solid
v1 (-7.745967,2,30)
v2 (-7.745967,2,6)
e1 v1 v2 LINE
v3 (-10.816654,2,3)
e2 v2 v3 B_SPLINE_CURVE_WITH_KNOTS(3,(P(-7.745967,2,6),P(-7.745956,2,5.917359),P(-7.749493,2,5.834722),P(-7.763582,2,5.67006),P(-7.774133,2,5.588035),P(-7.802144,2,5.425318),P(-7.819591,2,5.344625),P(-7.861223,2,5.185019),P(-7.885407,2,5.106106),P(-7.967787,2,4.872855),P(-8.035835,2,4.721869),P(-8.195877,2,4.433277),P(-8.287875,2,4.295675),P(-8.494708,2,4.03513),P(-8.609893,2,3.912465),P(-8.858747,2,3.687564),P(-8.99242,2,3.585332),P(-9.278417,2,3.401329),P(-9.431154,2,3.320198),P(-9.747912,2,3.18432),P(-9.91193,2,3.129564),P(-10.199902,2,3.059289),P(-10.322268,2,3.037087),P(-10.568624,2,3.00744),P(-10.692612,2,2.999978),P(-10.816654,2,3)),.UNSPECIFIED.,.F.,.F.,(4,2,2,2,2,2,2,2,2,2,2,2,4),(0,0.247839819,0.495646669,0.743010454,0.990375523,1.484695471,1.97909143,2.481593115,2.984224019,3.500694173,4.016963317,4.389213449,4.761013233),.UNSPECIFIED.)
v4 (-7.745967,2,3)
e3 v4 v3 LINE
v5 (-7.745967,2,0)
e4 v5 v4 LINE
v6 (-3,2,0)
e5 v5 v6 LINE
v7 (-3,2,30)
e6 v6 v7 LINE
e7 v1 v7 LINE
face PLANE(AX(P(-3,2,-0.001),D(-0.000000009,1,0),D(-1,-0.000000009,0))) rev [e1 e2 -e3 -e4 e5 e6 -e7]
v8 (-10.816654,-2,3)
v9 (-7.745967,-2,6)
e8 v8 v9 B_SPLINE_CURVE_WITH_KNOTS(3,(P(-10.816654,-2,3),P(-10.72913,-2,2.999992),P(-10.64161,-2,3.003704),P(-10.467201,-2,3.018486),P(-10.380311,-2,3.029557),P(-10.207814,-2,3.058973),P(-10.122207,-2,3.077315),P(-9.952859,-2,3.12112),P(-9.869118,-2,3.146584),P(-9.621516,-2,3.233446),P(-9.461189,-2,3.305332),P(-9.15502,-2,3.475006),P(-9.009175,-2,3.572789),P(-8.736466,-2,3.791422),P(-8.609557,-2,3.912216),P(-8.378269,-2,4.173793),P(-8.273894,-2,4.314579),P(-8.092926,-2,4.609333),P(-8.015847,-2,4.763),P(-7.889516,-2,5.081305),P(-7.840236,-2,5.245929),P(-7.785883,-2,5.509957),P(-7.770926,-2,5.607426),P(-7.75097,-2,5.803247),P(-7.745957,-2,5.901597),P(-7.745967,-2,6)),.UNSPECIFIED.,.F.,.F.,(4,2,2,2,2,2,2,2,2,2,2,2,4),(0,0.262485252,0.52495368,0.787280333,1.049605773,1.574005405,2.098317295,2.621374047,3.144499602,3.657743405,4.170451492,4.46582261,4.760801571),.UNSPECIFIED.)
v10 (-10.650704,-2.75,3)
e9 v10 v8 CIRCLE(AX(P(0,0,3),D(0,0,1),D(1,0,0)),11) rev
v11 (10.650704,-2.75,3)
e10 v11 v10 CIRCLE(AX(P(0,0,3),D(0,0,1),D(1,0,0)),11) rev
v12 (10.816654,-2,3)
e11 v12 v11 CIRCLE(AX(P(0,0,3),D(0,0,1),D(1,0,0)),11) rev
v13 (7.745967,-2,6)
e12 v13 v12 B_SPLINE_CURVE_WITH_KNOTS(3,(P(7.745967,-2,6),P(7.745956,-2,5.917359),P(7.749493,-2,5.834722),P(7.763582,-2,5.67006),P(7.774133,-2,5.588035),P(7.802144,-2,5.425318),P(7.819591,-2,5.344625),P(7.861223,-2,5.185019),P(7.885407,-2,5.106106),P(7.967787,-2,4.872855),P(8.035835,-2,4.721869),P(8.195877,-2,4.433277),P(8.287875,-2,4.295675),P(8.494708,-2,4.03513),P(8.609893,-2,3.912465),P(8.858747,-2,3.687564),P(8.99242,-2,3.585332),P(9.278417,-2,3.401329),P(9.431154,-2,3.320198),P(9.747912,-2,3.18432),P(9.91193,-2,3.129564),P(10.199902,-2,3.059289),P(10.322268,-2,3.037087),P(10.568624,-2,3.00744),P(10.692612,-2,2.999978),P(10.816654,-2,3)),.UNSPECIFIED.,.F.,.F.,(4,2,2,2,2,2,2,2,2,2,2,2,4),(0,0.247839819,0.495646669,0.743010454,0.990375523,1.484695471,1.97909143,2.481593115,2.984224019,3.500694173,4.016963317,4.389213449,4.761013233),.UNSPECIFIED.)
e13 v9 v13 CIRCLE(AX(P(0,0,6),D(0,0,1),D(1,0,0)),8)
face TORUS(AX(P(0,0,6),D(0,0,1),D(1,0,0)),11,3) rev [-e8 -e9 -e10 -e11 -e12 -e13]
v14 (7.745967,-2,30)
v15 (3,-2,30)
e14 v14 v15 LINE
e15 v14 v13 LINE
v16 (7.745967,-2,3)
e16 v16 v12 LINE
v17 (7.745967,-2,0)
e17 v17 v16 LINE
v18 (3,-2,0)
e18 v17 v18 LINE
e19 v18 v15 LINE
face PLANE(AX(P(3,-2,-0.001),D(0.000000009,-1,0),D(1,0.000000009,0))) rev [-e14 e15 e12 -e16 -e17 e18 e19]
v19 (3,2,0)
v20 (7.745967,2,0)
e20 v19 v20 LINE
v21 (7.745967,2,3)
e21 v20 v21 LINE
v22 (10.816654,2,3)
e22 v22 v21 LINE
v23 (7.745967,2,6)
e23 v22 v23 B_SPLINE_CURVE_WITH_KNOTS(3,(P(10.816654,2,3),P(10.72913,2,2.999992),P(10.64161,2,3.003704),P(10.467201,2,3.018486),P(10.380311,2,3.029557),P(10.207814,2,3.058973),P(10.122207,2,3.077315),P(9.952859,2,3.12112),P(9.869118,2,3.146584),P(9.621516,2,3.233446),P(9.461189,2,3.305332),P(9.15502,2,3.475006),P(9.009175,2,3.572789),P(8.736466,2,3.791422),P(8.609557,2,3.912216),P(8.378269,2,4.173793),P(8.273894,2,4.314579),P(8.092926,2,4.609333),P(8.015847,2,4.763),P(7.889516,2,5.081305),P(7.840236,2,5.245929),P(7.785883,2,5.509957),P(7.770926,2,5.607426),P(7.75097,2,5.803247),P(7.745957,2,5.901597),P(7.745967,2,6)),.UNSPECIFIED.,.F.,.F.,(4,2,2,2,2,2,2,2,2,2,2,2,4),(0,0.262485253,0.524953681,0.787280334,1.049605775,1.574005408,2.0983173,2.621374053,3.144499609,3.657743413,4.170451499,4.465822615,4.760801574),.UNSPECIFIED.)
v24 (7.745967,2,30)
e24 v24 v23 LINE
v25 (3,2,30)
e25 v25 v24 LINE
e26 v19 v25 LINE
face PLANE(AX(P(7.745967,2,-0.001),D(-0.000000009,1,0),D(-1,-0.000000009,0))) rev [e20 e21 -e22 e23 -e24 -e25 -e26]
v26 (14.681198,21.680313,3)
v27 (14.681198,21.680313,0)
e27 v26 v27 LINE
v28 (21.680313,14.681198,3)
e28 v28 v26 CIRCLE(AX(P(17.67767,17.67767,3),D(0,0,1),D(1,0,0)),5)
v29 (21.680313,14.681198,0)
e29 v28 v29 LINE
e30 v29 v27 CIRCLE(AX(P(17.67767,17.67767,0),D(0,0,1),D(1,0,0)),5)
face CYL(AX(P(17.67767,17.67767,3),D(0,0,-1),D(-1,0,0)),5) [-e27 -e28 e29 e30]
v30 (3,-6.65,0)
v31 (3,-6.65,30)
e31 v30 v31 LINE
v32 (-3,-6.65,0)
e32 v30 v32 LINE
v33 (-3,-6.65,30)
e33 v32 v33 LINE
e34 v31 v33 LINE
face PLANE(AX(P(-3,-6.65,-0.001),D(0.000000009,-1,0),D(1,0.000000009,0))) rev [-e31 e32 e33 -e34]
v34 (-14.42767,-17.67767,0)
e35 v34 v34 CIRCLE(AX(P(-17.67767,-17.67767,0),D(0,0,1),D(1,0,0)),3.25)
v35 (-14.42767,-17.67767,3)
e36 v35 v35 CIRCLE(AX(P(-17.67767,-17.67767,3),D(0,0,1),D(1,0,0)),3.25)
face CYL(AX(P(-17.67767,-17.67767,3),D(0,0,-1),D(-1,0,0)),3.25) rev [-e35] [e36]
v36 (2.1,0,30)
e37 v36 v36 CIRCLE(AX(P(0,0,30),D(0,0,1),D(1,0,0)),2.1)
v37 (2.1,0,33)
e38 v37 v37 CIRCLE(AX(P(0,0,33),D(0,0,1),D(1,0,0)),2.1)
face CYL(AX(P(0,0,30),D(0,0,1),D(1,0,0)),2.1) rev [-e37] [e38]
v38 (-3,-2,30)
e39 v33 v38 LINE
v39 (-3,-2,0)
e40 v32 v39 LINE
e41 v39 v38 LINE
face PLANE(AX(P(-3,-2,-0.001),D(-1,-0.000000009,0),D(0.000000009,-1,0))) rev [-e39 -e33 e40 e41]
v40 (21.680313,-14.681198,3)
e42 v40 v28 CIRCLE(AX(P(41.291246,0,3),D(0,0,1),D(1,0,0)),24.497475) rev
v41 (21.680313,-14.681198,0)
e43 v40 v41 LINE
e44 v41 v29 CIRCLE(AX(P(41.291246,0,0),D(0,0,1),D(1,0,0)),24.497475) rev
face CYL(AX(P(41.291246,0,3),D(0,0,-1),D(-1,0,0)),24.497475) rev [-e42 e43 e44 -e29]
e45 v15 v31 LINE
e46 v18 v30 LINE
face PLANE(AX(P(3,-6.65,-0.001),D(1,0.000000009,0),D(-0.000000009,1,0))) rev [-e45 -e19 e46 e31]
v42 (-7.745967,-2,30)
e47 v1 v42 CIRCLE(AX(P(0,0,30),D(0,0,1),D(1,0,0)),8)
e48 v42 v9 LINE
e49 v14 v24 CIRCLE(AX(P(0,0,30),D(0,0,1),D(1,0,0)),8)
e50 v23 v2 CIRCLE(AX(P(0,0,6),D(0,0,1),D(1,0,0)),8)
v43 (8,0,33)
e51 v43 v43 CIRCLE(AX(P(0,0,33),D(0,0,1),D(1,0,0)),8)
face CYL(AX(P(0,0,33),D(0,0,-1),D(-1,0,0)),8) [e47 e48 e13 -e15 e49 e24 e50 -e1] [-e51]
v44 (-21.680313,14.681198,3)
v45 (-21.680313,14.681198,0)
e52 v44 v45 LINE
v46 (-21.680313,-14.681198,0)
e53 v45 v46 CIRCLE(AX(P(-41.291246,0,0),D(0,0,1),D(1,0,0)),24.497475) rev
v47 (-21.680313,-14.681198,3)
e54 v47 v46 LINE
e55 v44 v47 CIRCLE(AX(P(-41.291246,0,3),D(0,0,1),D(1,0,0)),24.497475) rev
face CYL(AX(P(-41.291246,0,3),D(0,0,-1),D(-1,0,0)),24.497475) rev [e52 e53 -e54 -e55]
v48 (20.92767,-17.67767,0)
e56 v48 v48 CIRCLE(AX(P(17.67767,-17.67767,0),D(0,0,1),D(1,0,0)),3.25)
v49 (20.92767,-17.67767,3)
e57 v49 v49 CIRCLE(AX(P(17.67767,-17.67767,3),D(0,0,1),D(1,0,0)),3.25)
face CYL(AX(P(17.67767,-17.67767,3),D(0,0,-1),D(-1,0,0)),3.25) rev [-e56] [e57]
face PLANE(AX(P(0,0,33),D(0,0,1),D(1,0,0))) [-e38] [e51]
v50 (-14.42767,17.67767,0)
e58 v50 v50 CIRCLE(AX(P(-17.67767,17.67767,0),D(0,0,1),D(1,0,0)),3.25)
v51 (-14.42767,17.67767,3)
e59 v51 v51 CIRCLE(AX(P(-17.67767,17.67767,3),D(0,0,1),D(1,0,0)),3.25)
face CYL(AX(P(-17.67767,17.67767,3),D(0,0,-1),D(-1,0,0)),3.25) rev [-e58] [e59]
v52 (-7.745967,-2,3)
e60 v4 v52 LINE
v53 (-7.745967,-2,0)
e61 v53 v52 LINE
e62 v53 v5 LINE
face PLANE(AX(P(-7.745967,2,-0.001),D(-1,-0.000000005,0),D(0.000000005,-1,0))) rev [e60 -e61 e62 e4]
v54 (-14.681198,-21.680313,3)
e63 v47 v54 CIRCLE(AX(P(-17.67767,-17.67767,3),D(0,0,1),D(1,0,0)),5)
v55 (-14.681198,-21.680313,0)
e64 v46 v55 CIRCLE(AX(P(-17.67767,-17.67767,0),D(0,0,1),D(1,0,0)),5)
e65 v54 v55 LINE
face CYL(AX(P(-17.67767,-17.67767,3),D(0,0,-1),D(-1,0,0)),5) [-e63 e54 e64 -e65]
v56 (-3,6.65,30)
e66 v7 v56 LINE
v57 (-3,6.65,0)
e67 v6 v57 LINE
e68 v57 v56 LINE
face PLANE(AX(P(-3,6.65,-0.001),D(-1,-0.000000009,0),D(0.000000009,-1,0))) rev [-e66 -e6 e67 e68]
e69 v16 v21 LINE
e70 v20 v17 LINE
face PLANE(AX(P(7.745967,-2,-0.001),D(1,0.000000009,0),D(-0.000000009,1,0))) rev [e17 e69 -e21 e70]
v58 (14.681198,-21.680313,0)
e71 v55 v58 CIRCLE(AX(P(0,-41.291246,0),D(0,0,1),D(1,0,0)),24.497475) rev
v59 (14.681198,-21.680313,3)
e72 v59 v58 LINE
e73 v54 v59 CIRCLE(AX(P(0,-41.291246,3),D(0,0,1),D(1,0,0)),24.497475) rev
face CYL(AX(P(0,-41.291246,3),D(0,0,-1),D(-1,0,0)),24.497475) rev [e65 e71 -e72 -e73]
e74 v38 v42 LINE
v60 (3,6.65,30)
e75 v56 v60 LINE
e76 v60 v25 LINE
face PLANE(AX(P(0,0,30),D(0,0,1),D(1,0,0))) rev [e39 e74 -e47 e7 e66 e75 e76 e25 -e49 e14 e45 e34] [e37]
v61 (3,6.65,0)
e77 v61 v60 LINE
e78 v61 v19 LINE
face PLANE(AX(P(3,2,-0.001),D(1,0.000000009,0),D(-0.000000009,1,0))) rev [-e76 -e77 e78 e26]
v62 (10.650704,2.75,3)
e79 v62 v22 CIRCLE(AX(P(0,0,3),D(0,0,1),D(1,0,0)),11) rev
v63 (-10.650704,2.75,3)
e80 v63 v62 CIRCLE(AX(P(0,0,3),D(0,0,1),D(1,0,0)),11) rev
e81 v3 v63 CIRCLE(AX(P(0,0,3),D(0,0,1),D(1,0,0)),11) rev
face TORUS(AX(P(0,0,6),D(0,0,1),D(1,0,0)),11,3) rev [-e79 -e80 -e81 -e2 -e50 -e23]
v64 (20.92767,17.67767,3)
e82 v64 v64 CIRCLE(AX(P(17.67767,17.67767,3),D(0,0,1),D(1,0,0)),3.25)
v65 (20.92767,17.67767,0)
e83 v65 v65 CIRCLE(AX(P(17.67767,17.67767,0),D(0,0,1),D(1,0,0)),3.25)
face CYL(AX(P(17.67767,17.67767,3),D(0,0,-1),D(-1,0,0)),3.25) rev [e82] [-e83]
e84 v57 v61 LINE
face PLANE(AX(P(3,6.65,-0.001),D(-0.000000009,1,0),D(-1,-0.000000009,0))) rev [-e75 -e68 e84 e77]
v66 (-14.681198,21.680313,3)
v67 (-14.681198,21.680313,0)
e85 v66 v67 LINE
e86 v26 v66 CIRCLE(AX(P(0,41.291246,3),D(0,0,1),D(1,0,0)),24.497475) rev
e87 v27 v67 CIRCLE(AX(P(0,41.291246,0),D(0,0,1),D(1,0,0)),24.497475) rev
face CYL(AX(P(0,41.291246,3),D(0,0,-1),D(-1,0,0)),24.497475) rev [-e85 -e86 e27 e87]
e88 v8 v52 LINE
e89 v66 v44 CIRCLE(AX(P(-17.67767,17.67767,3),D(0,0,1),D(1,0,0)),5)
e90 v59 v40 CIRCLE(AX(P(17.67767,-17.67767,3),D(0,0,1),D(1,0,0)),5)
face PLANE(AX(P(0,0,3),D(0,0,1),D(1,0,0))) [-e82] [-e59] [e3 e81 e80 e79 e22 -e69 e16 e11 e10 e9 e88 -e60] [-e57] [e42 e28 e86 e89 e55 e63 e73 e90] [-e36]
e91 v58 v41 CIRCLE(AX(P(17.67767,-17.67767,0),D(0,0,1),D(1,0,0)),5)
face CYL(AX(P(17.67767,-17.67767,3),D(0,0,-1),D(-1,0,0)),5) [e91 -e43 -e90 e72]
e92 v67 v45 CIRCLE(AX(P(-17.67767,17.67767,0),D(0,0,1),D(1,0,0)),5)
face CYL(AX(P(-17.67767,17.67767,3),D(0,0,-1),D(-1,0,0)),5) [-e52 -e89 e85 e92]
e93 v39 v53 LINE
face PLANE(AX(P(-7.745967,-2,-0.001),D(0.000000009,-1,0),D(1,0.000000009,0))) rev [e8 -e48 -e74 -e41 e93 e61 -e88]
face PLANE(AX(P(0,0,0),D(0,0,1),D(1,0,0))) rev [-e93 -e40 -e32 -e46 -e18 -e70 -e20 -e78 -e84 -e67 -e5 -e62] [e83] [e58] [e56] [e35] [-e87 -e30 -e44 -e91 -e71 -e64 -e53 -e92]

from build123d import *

# Parameters (mm, degrees)
CROQUIS1_R              = 3.2499999999997446
CROQUIS1_R_2            = 3.249999999997429
CROQUIS1_R_3            = 3.249999999998684
SALIENTE_EXTRUIR1_DEPTH = 3
CORTAR_EXTRUIR2_REACH   = 34.211
SALIENTE_EXTRUIR2_DEPTH = 30
SALIENTE_EXTRUIR3_START = -3
CROQUIS4_R              = 8.000000000001583
CROQUIS4_R_2            = 2.1
SALIENTE_EXTRUIR3_DEPTH = 3
REDONDEO1_R             = 3


with BuildPart() as part:
    # Croquis1 → Saliente-Extruir1 (new body)
    with BuildSketch(Plane.XY):
        with BuildLine():
            ThreePointArc((-14.681197845286842, 21.680313336544412), (-21.21320343559782, 21.213203435599436), (-21.680313336542973, 14.681197845289143))
            ThreePointArc((-21.680313336542973, 14.681197845289143), (-16.79377171834698, -4.4873e-13), (-21.680313336546256, -14.681197845289011))
            ThreePointArc((-21.680313336546256, -14.681197845289011), (-21.213203435602523, -21.213203435600768), (-14.68119784529118, -21.680313336546952))
            ThreePointArc((-14.68119784529118, -21.680313336546952), (-1.37456e-12, -16.793771718350733), (14.681197845287352, -21.68031333655022))
            ThreePointArc((14.681197845287352, -21.68031333655022), (21.21320343559837, -21.213203435605198), (21.680313336544117, -14.68119784529431))
            ThreePointArc((21.680313336544117, -14.68119784529431), (16.79377171834798, -4.8379e-12), (21.680313336547112, 14.681197845283641))
            ThreePointArc((21.680313336547112, 14.681197845283641), (21.213203435602864, 21.21320343559648), (14.681197845291681, 21.680313336541143))
            ThreePointArc((14.681197845291681, 21.680313336541143), (1.87813e-12, 16.793771718344924), (-14.681197845286842, 21.680313336544412))
        make_face()
        with Locations((-17.677669529663632, 17.677669529664712)):
            Circle(CROQUIS1_R, mode=Mode.SUBTRACT)
        with Locations((17.67766952966688, 17.677669529661795)):
            Circle(CROQUIS1_R_2, mode=Mode.SUBTRACT)
        with Locations((17.67766952966414, -17.677669529670524)):
            Circle(CROQUIS1_R_3, mode=Mode.SUBTRACT)
        with Locations((-17.677669529667213, -17.677669529666943)):
            Circle(CROQUIS1_R, mode=Mode.SUBTRACT)
    extrude(amount=SALIENTE_EXTRUIR1_DEPTH)

    # Croquis2 → Cortar-Extruir2 (cut, up to next)
    with BuildSketch(Plane.XY.offset(3), mode=Mode.PRIVATE) as cortar_extruir2_sk1:
        Polygon((3.0000001045733526, -6.64999997299992), (3.000000062696712, -2.0000000028022047), (7.7459667027131305, -1.9999999600613383), (7.745966666690224, 2.00000009954332), (3.000000026673777, 2.000000056802398), (2.999999984797136, 6.650000027000114), (-3.0000001046098235, 6.649999972965725), (-3.000000062733182, 2.00000000276801), (-7.745966702749602, 1.9999999600271434), (-7.7459666821165225, -2.00000003997286), (-3.000000026710248, -1.9999999972319937), (-2.9999999848336065, -6.6500000270343085), align=None)
    cortar_extruir2_tool1 = extrude(cortar_extruir2_sk1.sketch, amount=-CORTAR_EXTRUIR2_REACH, mode=Mode.PRIVATE) & part.part
    add(cortar_extruir2_tool1.solids().sort_by_distance((0, 0, 3))[0], mode=Mode.SUBTRACT)

    # Croquis3 → Saliente-Extruir2 (add)
    with BuildSketch(Plane.XY.offset(3)):
        with BuildLine():
            Line((3.000000026673777, 2.000000056802398), (7.745966666690224, 2.00000009954332))
            ThreePointArc((7.7459666667244, 2.000000099552144), (-7.205040071e-08, 8.000000000013381), (-7.745966702749601, 1.9999999600271456))
            Line((-7.745966702749602, 1.9999999600271434), (-3.000000062733182, 2.00000000276801))
            Line((-3.000000062733182, 2.00000000276801), (-3.0000001046098235, 6.649999972965725))
            Line((-3.000000104609824, 6.649999972965725), (2.999999984797136, 6.650000027000114))
            Line((2.999999984797136, 6.650000027000113), (3.000000026673777, 2.000000056802398))
        make_face()
        with BuildLine():
            Line((3.000000062696712, -2.0000000028022047), (3.0000001045733526, -6.64999997299992))
            Line((3.0000001045733526, -6.64999997299992), (-2.9999999848336065, -6.6500000270343085))
            Line((-2.9999999848336065, -6.6500000270343085), (-3.000000026710248, -1.9999999972319937))
            Line((-3.0000000267102482, -1.9999999972319937), (-7.7459666821165225, -2.00000003997286))
            ThreePointArc((-7.745966682108257, -2.000000039970724), (4.126157047e-08, -8.000000000013381), (7.745966702739044, -1.9999999600680332))
            Line((7.7459667027131305, -1.9999999600613383), (3.000000062696712, -2.0000000028022047))
        make_face()
    extrude(amount=SALIENTE_EXTRUIR2_DEPTH)

    # Croquis4 → Saliente-Extruir3 (add)
    with BuildSketch(Plane.XY.offset(33).offset(SALIENTE_EXTRUIR3_START)):
        with Locations(Location((0, 0, 0), (0, 0, 165.52248811))):
            Circle(CROQUIS4_R)
        Circle(CROQUIS4_R_2, mode=Mode.SUBTRACT)
    extrude(amount=SALIENTE_EXTRUIR3_DEPTH)

    # Redondeo1
    # the kernel refuses this fillet: 3 mm, written as the material it adds along each edge
    with BuildSketch(Plane(origin=(4.4e-16, 4.4e-16, 3), x_dir=(-0.22595414891367588, 0.9741379381733866, 0), z_dir=(0.9741379381733866, 0.22595414891367588, 0))) as redondeo1_piece_1_section:
        with BuildLine():
            CenterArc((8.000000000013381 + REDONDEO1_R, REDONDEO1_R), REDONDEO1_R, 180, 90)
            Line((8.000000000013383, REDONDEO1_R), (8.000000000013381, 0))
            Line((8.000000000013381, 0), (8.000000000013381 + REDONDEO1_R, 0))
        make_face()
    redondeo1_piece_1 = revolve(axis=Axis((4.4e-16, 4.4e-16, 3), (0, 0, 1)), revolution_arc=333.88201682059855, mode=Mode.PRIVATE)
    redondeo1_piece_1 = split(redondeo1_piece_1, bisect_by=Plane(origin=(-7.745966692433063, -3.99557857e-08, 3), z_dir=(1.0, 5.158269811289524e-09, 0)), keep=Keep.TOP, mode=Mode.PRIVATE)
    redondeo1_piece_1 = split(redondeo1_piece_1, bisect_by=Plane(origin=(7.745966684701678, 6.975805769e-08, 3), z_dir=(-1.0, -9.005726474694729e-09, 0)), keep=Keep.TOP, mode=Mode.PRIVATE)
    add(redondeo1_piece_1)
    with BuildSketch(Plane(origin=(4.4e-16, 4.4e-16, 3), x_dir=(-0.22595414891367588, 0.9741379381733866, 0), z_dir=(0.9741379381733866, 0.22595414891367588, 0))) as redondeo1_piece_2_section:
        with BuildLine():
            CenterArc((8.000000000013381 + REDONDEO1_R, REDONDEO1_R), REDONDEO1_R, 180, 90)
            Line((8.000000000013383, REDONDEO1_R), (8.000000000013381, 0))
            Line((8.000000000013381, 0), (8.000000000013381 + REDONDEO1_R, 0))
        make_face()
    redondeo1_piece_2 = revolve(axis=Axis((4.4e-16, 4.4e-16, 3), (0, 0, 1)), revolution_arc=333.88201682059855, mode=Mode.PRIVATE)
    redondeo1_piece_2 = split(redondeo1_piece_2, bisect_by=Plane(origin=(-1.801144813e-08, 2.0000000297851828, 3), z_dir=(-9.005724153490957e-09, 1.0, 0)), keep=Keep.TOP, mode=Mode.PRIVATE)
    add(redondeo1_piece_2)
    with BuildSketch(Plane(origin=(4.4e-16, 4.4e-16, 3), x_dir=(-0.22595414891367588, 0.9741379381733866, 0), z_dir=(0.9741379381733866, 0.22595414891367588, 0))) as redondeo1_piece_3_section:
        with BuildLine():
            CenterArc((8.000000000013381 + REDONDEO1_R, REDONDEO1_R), REDONDEO1_R, 180, 90)
            Line((8.000000000013383, REDONDEO1_R), (8.000000000013381, 0))
            Line((8.000000000013381, 0), (8.000000000013381 + REDONDEO1_R, 0))
        make_face()
    redondeo1_piece_3 = revolve(axis=Axis((4.4e-16, 4.4e-16, 3), (0, 0, 1)), revolution_arc=333.88201682059855, mode=Mode.PRIVATE)
    redondeo1_piece_3 = split(redondeo1_piece_3, bisect_by=Plane(origin=(1.801144902e-08, -2.0000000298193776, 3), z_dir=(9.005724153490959e-09, -1.0, 0)), keep=Keep.TOP, mode=Mode.PRIVATE)
    add(redondeo1_piece_3)
    with BuildSketch(Plane(origin=(0, -4.4e-16, 3), x_dir=(0.22595415641693267, -0.9741379364329841, 0), z_dir=(-0.9741379364329841, -0.22595415641693267, 0))) as redondeo1_piece_4_section:
        with BuildLine():
            CenterArc((8.000000000013381 + REDONDEO1_R, REDONDEO1_R), REDONDEO1_R, 180, 90)
            Line((8.000000000013381, REDONDEO1_R), (8.000000000013381, 0))
            Line((8.000000000013381, 0), (8.000000000013381 + REDONDEO1_R, 0))
        make_face()
    redondeo1_piece_4 = revolve(axis=Axis((0, -4.4e-16, 3), (0, 0, 1)), revolution_arc=333.8820163789793, mode=Mode.PRIVATE)
    redondeo1_piece_4 = split(redondeo1_piece_4, bisect_by=Plane(origin=(-7.745966692433063, -3.995578659e-08, 3), z_dir=(1.0, 5.158269811289524e-09, 0)), keep=Keep.TOP, mode=Mode.PRIVATE)
    redondeo1_piece_4 = split(redondeo1_piece_4, bisect_by=Plane(origin=(7.745966684701678, 6.97580568e-08, 3), z_dir=(-1.0, -9.005726474694729e-09, 0)), keep=Keep.TOP, mode=Mode.PRIVATE)
    add(redondeo1_piece_4)
    with BuildSketch(Plane(origin=(0, -4.4e-16, 3), x_dir=(0.22595415641693267, -0.9741379364329841, 0), z_dir=(-0.9741379364329841, -0.22595415641693267, 0))) as redondeo1_piece_5_section:
        with BuildLine():
            CenterArc((8.000000000013381 + REDONDEO1_R, REDONDEO1_R), REDONDEO1_R, 180, 90)
            Line((8.000000000013381, REDONDEO1_R), (8.000000000013381, 0))
            Line((8.000000000013381, 0), (8.000000000013381 + REDONDEO1_R, 0))
        make_face()
    redondeo1_piece_5 = revolve(axis=Axis((0, -4.4e-16, 3), (0, 0, 1)), revolution_arc=333.8820163789793, mode=Mode.PRIVATE)
    redondeo1_piece_5 = split(redondeo1_piece_5, bisect_by=Plane(origin=(1.801144858e-08, -2.0000000298193776, 3), z_dir=(9.005724153490959e-09, -1.0, 0)), keep=Keep.TOP, mode=Mode.PRIVATE)
    add(redondeo1_piece_5)
    with BuildSketch(Plane(origin=(0, -4.4e-16, 3), x_dir=(0.22595415641693267, -0.9741379364329841, 0), z_dir=(-0.9741379364329841, -0.22595415641693267, 0))) as redondeo1_piece_6_section:
        with BuildLine():
            CenterArc((8.000000000013381 + REDONDEO1_R, REDONDEO1_R), REDONDEO1_R, 180, 90)
            Line((8.000000000013381, REDONDEO1_R), (8.000000000013381, 0))
            Line((8.000000000013381, 0), (8.000000000013381 + REDONDEO1_R, 0))
        make_face()
    redondeo1_piece_6 = revolve(axis=Axis((0, -4.4e-16, 3), (0, 0, 1)), revolution_arc=333.8820163789793, mode=Mode.PRIVATE)
    redondeo1_piece_6 = split(redondeo1_piece_6, bisect_by=Plane(origin=(-1.801144858e-08, 2.0000000297851828, 3), z_dir=(-9.005724153490957e-09, 1.0, 0)), keep=Keep.TOP, mode=Mode.PRIVATE)
    add(redondeo1_piece_6)


solid = part.part
